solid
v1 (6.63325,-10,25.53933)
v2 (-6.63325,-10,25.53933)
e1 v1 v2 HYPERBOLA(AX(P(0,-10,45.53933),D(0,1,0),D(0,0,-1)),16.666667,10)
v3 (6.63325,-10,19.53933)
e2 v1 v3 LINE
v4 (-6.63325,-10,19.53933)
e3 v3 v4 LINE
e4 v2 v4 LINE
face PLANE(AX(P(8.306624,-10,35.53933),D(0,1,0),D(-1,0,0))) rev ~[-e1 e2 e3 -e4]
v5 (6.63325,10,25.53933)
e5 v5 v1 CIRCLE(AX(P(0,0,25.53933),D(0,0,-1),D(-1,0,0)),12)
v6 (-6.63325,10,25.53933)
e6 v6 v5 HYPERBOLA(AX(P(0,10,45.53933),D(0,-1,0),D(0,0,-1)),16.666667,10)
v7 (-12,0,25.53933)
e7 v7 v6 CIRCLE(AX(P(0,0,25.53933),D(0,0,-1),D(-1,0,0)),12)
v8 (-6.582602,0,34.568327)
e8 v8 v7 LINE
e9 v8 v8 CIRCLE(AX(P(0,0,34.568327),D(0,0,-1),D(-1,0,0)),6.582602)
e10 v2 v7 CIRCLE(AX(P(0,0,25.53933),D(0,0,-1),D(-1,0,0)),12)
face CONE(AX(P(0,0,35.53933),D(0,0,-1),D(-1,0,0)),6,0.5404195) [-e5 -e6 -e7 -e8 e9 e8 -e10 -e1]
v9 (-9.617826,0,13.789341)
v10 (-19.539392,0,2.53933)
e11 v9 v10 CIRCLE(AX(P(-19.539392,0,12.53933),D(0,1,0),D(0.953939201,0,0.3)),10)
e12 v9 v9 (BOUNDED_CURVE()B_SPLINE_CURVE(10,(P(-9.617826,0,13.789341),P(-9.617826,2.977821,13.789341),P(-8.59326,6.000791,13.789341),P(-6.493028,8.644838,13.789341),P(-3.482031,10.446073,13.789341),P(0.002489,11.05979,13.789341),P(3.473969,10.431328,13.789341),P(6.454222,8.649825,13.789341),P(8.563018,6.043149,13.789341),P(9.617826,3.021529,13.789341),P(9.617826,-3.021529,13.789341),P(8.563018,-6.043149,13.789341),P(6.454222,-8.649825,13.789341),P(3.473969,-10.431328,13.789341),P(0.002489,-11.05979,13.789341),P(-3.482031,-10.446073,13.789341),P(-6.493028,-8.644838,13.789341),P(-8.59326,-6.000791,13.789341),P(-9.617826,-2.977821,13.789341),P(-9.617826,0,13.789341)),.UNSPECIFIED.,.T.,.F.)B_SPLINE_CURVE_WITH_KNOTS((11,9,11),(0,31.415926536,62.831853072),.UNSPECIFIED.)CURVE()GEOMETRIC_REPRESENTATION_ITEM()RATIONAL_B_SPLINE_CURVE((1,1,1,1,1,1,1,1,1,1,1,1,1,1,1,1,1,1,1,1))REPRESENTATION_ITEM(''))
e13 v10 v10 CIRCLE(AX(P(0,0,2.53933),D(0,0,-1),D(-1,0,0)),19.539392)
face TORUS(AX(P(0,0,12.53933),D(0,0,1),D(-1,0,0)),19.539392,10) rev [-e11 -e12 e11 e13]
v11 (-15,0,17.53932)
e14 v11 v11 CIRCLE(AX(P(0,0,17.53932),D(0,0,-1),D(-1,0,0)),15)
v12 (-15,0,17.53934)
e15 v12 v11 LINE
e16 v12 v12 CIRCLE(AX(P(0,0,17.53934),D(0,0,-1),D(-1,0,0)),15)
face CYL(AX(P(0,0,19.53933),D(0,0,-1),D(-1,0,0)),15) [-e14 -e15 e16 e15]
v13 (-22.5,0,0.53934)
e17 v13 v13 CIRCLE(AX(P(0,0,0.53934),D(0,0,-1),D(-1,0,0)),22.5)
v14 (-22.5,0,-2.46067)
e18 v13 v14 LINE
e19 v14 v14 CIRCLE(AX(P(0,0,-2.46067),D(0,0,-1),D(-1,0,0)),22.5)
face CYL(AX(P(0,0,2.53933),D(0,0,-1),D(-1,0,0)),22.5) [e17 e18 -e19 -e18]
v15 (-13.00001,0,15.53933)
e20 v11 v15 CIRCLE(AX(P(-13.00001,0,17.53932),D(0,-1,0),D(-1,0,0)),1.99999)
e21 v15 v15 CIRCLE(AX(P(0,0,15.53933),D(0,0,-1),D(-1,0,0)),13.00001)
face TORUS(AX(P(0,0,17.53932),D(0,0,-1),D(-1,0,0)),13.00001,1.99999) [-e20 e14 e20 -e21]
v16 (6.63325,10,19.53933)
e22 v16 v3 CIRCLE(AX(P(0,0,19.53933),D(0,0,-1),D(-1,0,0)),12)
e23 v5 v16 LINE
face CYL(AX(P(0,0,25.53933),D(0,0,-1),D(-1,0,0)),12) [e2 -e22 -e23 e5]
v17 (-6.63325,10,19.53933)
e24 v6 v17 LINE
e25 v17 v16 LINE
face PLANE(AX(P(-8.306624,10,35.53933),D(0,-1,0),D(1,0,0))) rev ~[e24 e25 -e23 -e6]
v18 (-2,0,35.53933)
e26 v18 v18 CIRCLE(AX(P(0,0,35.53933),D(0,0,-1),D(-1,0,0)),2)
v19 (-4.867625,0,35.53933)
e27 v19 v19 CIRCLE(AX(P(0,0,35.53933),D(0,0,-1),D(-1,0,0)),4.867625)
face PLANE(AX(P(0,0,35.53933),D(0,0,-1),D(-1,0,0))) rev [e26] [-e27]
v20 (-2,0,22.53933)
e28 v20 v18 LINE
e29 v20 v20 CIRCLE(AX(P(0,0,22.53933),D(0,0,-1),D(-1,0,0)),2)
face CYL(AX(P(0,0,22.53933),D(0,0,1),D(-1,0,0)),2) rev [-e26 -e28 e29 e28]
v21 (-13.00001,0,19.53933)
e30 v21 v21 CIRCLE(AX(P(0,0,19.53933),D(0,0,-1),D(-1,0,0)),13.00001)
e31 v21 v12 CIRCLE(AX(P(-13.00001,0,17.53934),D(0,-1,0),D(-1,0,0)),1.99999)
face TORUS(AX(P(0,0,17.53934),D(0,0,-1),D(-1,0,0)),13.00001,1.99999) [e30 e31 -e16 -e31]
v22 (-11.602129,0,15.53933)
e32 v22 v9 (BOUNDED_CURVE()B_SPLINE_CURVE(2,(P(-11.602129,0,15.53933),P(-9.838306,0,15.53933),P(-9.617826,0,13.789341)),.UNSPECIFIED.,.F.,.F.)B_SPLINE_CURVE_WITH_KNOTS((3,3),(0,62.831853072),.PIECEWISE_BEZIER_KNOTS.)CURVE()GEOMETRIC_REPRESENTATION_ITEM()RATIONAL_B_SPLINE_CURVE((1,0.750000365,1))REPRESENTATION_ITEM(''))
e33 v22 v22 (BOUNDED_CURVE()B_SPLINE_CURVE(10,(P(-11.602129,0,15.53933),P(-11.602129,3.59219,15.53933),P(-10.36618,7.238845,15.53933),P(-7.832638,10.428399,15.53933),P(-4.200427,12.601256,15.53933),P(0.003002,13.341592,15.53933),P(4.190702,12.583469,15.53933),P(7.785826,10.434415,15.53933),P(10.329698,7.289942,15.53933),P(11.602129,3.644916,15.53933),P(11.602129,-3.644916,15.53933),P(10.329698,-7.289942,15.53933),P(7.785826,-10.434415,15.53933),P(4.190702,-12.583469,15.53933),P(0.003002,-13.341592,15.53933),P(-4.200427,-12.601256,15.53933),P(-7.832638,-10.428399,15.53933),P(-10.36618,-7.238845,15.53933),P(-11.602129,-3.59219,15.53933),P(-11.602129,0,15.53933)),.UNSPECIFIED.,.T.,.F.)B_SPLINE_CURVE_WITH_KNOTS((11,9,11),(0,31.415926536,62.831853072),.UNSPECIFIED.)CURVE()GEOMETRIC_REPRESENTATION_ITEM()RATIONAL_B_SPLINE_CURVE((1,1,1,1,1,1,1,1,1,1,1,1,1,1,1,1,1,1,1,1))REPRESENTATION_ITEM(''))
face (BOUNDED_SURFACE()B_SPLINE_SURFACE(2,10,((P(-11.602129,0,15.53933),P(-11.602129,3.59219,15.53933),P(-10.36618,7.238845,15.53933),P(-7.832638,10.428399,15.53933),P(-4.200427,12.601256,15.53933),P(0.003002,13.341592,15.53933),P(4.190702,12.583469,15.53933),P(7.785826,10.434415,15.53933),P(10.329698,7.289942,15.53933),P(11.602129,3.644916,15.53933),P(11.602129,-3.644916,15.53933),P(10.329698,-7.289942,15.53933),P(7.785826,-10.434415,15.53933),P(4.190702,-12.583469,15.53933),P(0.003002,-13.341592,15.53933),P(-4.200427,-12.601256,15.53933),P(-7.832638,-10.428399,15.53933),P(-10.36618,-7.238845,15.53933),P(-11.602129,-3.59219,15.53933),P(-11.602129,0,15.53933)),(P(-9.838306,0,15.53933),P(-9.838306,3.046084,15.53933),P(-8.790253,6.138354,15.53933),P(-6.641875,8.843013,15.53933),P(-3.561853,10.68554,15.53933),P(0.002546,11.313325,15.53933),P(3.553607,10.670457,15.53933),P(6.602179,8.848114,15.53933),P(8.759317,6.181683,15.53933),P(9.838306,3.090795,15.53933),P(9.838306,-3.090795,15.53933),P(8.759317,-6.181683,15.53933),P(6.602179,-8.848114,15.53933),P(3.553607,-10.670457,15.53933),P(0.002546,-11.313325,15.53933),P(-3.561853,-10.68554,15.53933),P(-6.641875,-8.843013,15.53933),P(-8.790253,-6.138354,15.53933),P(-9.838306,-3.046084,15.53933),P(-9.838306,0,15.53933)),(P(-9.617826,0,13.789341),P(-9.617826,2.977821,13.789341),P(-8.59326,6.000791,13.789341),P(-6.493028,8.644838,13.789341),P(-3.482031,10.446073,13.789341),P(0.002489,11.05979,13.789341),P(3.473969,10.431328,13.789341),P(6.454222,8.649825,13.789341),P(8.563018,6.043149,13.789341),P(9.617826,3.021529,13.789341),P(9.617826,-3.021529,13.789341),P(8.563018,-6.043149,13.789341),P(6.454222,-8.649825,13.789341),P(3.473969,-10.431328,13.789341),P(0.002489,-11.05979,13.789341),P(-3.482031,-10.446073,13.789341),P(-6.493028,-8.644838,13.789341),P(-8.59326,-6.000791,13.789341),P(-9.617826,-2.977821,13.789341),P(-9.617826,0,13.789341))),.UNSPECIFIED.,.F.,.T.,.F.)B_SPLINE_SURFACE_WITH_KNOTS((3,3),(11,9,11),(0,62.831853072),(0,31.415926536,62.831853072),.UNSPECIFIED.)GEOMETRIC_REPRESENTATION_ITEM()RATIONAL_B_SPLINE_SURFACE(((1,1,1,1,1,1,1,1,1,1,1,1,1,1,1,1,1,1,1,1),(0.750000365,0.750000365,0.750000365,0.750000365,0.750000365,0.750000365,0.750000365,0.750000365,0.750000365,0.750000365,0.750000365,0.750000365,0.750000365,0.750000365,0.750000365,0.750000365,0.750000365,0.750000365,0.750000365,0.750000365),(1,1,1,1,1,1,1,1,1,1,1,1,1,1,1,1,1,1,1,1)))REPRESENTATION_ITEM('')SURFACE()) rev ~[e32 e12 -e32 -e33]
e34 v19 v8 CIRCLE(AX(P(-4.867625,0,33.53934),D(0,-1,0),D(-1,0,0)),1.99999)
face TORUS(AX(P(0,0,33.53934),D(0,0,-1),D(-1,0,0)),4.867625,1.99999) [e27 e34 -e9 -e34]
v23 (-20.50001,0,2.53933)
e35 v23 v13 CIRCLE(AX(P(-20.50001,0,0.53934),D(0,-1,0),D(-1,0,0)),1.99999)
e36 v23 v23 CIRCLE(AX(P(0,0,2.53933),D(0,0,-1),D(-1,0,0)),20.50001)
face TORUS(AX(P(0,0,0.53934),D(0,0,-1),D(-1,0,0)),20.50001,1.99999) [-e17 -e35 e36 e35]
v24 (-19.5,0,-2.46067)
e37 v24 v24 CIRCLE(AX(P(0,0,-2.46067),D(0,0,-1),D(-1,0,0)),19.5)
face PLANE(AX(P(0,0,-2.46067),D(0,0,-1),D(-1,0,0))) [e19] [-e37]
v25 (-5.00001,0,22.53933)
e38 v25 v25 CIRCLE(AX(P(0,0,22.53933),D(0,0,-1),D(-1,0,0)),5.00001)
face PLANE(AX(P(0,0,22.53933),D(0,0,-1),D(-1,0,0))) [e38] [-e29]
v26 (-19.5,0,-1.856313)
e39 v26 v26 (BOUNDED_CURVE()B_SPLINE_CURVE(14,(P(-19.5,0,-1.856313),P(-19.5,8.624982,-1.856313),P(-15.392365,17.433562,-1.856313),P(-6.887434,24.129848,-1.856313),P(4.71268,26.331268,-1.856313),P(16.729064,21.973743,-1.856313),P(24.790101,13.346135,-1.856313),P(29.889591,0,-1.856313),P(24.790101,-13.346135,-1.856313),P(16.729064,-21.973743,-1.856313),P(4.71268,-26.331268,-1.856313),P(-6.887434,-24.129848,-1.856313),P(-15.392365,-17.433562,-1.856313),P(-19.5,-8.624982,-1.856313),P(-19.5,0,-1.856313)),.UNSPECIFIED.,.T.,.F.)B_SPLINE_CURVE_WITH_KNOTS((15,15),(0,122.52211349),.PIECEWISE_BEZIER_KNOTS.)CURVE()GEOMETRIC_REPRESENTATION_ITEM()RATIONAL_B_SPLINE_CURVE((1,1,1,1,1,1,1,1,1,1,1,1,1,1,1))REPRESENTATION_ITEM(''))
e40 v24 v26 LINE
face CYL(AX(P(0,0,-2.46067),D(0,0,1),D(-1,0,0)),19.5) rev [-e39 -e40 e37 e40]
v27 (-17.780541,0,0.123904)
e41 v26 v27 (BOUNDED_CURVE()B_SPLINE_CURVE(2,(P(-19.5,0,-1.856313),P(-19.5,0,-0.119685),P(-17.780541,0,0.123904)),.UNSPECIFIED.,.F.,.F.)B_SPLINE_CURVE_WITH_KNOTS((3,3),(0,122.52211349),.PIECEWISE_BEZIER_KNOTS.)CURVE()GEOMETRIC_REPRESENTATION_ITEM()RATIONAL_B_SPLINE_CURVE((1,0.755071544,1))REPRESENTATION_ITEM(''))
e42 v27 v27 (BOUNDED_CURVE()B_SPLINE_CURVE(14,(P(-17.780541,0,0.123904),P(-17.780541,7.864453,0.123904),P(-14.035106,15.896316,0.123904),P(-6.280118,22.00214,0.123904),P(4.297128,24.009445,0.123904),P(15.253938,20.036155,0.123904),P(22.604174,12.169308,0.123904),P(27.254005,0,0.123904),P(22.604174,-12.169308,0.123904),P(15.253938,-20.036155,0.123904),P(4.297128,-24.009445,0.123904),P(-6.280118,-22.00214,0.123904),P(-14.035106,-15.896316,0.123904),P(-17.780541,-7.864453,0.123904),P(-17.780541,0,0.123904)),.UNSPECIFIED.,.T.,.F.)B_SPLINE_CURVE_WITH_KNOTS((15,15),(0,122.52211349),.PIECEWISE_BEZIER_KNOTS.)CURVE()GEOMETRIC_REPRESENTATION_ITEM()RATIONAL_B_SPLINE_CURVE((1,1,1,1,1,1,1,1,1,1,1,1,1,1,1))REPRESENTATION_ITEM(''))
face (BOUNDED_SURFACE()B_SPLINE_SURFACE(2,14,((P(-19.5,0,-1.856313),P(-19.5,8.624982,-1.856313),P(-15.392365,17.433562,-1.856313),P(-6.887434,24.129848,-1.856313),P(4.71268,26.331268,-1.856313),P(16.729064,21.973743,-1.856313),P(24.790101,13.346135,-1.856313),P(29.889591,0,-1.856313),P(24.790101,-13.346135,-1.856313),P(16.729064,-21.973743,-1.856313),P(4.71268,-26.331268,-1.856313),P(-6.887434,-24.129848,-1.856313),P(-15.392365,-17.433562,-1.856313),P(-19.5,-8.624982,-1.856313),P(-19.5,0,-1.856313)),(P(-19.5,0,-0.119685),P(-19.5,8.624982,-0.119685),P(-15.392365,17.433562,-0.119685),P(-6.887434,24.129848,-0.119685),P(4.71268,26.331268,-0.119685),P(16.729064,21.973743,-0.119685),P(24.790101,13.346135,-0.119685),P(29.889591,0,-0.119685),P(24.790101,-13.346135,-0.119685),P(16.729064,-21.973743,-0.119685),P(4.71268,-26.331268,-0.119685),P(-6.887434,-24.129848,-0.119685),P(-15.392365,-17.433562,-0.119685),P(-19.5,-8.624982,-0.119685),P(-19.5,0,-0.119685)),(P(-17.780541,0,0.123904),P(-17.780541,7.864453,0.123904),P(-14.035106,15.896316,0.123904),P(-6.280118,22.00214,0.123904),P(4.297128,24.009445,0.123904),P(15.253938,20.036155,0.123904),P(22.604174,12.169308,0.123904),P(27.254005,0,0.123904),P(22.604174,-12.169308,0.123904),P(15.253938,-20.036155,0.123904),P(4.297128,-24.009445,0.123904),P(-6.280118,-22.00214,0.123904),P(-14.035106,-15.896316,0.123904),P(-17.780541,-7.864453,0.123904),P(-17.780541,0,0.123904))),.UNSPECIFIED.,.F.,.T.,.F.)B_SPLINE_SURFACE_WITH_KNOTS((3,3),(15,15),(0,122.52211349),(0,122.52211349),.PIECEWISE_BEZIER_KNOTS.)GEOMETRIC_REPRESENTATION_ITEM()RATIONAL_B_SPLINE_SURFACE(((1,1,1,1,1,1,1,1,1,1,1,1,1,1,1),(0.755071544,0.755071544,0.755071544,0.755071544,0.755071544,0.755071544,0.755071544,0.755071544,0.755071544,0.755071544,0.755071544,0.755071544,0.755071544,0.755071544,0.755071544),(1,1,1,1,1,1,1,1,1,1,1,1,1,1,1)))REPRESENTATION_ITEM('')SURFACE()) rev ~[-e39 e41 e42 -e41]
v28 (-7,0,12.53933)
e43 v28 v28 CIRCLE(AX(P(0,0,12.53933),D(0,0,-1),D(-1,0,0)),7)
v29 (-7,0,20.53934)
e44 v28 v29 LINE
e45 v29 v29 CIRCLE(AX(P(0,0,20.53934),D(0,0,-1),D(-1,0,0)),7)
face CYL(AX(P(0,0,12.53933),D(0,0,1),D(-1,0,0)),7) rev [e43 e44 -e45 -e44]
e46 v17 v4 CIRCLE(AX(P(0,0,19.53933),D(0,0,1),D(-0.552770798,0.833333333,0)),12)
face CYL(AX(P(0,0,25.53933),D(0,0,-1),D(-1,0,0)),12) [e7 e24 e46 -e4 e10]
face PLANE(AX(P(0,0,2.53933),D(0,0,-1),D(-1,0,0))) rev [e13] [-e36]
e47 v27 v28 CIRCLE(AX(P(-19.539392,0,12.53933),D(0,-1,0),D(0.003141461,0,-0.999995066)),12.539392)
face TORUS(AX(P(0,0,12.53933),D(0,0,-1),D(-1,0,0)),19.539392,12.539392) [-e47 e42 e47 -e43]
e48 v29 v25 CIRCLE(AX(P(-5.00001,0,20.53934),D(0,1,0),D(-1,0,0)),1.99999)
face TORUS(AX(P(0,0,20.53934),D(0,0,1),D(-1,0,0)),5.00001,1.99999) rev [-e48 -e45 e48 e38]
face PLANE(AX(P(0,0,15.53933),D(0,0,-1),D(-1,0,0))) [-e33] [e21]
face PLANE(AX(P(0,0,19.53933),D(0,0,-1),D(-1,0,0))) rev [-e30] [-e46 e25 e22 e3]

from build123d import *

# Parameters (mm, degrees)
F2_R     = 1.99999
F4_DEPTH = 16


# Not quite as in the source:
# - a fillet or chamfer is up to 0.001 mm smaller than in the source, because OpenCascade refuses the exact size


with BuildPart() as f1:
    # F0 (on Front) → F1 (revolve)
    with BuildSketch(Plane.XZ):
        with BuildLine():
            Line((-2, 22.5393301398), (-2, 35.5393301398))
            Line((-2, 35.5393301398), (-6, 35.5393301398))
            Line((-6, 35.5393301398), (-12, 25.5393301398))
            Line((-12, 25.5393301398), (-12, 19.5393301398))
            Line((-12, 19.5393301398), (-15, 19.5393301398))
            Line((-15, 19.5393301398), (-15, 15.5393301398))
            Line((-15, 15.5393301398), (-10, 15.5393301398))
            ThreePointArc((-10, 15.5393301398), (-11.4771342659, 6.6232503567), (-19.5393920142, 2.5393301398))
            Line((-19.5393920142, 2.5393301398), (-22.5, 2.5393301398))
            Line((-22.5, 2.5393301398), (-22.5, -2.4606698602))
            Line((-22.5, -2.4606698602), (-19.5, -2.4606698602))
            Line((-19.5, -2.4606698602), (-19.5, 0))
            ThreePointArc((-19.5, 0), (-10.6587866296, 3.6865791499), (-7, 12.5393301398))
            Line((-7, 12.5393301398), (-7, 22.5393301398))
            Line((-7, 22.5393301398), (-2, 22.5393301398))
        make_face()
    revolve(axis=Axis((0, 0, 14.2342122272), (0, 0, -1)))

    # F2 (radius 2 in the source; OpenCascade refuses exactly that, so slightly less here)
    f2_edges = [f1.edges().sort_by_distance(p)[0] for p in [
        (22.5, 0, 2.53933),
        (15, 0, 15.53933),
        (15, 0, 19.53933),
        (6, 0, 35.53933),
        (19.5, 0, 0),
        (7, 0, 12.53933),
        (-10.658787, 0, 3.686579),
        (7, 0, 22.53933),
        (10, 0, 15.53933),
    ]]
    fillet(f2_edges, radius=F2_R)

    # F3 (on face) → F4 (cut, through all)
    with BuildSketch(Plane.XY.offset(35.5393301398)):
        with BuildLine():
            Line((-8.3066238629, 10), (8.3066238629, 10))
            ThreePointArc((8.3066238629, 10), (0, 13), (-8.3066238629, 10))
        make_face()
        with BuildLine():
            ThreePointArc((-8.3066238629, -10), (0, -13), (8.3066238629, -10))
            Line((8.3066238629, -10), (-8.3066238629, -10))
        make_face()
    extrude(amount=-F4_DEPTH, mode=Mode.SUBTRACT)


solid = f1.part
